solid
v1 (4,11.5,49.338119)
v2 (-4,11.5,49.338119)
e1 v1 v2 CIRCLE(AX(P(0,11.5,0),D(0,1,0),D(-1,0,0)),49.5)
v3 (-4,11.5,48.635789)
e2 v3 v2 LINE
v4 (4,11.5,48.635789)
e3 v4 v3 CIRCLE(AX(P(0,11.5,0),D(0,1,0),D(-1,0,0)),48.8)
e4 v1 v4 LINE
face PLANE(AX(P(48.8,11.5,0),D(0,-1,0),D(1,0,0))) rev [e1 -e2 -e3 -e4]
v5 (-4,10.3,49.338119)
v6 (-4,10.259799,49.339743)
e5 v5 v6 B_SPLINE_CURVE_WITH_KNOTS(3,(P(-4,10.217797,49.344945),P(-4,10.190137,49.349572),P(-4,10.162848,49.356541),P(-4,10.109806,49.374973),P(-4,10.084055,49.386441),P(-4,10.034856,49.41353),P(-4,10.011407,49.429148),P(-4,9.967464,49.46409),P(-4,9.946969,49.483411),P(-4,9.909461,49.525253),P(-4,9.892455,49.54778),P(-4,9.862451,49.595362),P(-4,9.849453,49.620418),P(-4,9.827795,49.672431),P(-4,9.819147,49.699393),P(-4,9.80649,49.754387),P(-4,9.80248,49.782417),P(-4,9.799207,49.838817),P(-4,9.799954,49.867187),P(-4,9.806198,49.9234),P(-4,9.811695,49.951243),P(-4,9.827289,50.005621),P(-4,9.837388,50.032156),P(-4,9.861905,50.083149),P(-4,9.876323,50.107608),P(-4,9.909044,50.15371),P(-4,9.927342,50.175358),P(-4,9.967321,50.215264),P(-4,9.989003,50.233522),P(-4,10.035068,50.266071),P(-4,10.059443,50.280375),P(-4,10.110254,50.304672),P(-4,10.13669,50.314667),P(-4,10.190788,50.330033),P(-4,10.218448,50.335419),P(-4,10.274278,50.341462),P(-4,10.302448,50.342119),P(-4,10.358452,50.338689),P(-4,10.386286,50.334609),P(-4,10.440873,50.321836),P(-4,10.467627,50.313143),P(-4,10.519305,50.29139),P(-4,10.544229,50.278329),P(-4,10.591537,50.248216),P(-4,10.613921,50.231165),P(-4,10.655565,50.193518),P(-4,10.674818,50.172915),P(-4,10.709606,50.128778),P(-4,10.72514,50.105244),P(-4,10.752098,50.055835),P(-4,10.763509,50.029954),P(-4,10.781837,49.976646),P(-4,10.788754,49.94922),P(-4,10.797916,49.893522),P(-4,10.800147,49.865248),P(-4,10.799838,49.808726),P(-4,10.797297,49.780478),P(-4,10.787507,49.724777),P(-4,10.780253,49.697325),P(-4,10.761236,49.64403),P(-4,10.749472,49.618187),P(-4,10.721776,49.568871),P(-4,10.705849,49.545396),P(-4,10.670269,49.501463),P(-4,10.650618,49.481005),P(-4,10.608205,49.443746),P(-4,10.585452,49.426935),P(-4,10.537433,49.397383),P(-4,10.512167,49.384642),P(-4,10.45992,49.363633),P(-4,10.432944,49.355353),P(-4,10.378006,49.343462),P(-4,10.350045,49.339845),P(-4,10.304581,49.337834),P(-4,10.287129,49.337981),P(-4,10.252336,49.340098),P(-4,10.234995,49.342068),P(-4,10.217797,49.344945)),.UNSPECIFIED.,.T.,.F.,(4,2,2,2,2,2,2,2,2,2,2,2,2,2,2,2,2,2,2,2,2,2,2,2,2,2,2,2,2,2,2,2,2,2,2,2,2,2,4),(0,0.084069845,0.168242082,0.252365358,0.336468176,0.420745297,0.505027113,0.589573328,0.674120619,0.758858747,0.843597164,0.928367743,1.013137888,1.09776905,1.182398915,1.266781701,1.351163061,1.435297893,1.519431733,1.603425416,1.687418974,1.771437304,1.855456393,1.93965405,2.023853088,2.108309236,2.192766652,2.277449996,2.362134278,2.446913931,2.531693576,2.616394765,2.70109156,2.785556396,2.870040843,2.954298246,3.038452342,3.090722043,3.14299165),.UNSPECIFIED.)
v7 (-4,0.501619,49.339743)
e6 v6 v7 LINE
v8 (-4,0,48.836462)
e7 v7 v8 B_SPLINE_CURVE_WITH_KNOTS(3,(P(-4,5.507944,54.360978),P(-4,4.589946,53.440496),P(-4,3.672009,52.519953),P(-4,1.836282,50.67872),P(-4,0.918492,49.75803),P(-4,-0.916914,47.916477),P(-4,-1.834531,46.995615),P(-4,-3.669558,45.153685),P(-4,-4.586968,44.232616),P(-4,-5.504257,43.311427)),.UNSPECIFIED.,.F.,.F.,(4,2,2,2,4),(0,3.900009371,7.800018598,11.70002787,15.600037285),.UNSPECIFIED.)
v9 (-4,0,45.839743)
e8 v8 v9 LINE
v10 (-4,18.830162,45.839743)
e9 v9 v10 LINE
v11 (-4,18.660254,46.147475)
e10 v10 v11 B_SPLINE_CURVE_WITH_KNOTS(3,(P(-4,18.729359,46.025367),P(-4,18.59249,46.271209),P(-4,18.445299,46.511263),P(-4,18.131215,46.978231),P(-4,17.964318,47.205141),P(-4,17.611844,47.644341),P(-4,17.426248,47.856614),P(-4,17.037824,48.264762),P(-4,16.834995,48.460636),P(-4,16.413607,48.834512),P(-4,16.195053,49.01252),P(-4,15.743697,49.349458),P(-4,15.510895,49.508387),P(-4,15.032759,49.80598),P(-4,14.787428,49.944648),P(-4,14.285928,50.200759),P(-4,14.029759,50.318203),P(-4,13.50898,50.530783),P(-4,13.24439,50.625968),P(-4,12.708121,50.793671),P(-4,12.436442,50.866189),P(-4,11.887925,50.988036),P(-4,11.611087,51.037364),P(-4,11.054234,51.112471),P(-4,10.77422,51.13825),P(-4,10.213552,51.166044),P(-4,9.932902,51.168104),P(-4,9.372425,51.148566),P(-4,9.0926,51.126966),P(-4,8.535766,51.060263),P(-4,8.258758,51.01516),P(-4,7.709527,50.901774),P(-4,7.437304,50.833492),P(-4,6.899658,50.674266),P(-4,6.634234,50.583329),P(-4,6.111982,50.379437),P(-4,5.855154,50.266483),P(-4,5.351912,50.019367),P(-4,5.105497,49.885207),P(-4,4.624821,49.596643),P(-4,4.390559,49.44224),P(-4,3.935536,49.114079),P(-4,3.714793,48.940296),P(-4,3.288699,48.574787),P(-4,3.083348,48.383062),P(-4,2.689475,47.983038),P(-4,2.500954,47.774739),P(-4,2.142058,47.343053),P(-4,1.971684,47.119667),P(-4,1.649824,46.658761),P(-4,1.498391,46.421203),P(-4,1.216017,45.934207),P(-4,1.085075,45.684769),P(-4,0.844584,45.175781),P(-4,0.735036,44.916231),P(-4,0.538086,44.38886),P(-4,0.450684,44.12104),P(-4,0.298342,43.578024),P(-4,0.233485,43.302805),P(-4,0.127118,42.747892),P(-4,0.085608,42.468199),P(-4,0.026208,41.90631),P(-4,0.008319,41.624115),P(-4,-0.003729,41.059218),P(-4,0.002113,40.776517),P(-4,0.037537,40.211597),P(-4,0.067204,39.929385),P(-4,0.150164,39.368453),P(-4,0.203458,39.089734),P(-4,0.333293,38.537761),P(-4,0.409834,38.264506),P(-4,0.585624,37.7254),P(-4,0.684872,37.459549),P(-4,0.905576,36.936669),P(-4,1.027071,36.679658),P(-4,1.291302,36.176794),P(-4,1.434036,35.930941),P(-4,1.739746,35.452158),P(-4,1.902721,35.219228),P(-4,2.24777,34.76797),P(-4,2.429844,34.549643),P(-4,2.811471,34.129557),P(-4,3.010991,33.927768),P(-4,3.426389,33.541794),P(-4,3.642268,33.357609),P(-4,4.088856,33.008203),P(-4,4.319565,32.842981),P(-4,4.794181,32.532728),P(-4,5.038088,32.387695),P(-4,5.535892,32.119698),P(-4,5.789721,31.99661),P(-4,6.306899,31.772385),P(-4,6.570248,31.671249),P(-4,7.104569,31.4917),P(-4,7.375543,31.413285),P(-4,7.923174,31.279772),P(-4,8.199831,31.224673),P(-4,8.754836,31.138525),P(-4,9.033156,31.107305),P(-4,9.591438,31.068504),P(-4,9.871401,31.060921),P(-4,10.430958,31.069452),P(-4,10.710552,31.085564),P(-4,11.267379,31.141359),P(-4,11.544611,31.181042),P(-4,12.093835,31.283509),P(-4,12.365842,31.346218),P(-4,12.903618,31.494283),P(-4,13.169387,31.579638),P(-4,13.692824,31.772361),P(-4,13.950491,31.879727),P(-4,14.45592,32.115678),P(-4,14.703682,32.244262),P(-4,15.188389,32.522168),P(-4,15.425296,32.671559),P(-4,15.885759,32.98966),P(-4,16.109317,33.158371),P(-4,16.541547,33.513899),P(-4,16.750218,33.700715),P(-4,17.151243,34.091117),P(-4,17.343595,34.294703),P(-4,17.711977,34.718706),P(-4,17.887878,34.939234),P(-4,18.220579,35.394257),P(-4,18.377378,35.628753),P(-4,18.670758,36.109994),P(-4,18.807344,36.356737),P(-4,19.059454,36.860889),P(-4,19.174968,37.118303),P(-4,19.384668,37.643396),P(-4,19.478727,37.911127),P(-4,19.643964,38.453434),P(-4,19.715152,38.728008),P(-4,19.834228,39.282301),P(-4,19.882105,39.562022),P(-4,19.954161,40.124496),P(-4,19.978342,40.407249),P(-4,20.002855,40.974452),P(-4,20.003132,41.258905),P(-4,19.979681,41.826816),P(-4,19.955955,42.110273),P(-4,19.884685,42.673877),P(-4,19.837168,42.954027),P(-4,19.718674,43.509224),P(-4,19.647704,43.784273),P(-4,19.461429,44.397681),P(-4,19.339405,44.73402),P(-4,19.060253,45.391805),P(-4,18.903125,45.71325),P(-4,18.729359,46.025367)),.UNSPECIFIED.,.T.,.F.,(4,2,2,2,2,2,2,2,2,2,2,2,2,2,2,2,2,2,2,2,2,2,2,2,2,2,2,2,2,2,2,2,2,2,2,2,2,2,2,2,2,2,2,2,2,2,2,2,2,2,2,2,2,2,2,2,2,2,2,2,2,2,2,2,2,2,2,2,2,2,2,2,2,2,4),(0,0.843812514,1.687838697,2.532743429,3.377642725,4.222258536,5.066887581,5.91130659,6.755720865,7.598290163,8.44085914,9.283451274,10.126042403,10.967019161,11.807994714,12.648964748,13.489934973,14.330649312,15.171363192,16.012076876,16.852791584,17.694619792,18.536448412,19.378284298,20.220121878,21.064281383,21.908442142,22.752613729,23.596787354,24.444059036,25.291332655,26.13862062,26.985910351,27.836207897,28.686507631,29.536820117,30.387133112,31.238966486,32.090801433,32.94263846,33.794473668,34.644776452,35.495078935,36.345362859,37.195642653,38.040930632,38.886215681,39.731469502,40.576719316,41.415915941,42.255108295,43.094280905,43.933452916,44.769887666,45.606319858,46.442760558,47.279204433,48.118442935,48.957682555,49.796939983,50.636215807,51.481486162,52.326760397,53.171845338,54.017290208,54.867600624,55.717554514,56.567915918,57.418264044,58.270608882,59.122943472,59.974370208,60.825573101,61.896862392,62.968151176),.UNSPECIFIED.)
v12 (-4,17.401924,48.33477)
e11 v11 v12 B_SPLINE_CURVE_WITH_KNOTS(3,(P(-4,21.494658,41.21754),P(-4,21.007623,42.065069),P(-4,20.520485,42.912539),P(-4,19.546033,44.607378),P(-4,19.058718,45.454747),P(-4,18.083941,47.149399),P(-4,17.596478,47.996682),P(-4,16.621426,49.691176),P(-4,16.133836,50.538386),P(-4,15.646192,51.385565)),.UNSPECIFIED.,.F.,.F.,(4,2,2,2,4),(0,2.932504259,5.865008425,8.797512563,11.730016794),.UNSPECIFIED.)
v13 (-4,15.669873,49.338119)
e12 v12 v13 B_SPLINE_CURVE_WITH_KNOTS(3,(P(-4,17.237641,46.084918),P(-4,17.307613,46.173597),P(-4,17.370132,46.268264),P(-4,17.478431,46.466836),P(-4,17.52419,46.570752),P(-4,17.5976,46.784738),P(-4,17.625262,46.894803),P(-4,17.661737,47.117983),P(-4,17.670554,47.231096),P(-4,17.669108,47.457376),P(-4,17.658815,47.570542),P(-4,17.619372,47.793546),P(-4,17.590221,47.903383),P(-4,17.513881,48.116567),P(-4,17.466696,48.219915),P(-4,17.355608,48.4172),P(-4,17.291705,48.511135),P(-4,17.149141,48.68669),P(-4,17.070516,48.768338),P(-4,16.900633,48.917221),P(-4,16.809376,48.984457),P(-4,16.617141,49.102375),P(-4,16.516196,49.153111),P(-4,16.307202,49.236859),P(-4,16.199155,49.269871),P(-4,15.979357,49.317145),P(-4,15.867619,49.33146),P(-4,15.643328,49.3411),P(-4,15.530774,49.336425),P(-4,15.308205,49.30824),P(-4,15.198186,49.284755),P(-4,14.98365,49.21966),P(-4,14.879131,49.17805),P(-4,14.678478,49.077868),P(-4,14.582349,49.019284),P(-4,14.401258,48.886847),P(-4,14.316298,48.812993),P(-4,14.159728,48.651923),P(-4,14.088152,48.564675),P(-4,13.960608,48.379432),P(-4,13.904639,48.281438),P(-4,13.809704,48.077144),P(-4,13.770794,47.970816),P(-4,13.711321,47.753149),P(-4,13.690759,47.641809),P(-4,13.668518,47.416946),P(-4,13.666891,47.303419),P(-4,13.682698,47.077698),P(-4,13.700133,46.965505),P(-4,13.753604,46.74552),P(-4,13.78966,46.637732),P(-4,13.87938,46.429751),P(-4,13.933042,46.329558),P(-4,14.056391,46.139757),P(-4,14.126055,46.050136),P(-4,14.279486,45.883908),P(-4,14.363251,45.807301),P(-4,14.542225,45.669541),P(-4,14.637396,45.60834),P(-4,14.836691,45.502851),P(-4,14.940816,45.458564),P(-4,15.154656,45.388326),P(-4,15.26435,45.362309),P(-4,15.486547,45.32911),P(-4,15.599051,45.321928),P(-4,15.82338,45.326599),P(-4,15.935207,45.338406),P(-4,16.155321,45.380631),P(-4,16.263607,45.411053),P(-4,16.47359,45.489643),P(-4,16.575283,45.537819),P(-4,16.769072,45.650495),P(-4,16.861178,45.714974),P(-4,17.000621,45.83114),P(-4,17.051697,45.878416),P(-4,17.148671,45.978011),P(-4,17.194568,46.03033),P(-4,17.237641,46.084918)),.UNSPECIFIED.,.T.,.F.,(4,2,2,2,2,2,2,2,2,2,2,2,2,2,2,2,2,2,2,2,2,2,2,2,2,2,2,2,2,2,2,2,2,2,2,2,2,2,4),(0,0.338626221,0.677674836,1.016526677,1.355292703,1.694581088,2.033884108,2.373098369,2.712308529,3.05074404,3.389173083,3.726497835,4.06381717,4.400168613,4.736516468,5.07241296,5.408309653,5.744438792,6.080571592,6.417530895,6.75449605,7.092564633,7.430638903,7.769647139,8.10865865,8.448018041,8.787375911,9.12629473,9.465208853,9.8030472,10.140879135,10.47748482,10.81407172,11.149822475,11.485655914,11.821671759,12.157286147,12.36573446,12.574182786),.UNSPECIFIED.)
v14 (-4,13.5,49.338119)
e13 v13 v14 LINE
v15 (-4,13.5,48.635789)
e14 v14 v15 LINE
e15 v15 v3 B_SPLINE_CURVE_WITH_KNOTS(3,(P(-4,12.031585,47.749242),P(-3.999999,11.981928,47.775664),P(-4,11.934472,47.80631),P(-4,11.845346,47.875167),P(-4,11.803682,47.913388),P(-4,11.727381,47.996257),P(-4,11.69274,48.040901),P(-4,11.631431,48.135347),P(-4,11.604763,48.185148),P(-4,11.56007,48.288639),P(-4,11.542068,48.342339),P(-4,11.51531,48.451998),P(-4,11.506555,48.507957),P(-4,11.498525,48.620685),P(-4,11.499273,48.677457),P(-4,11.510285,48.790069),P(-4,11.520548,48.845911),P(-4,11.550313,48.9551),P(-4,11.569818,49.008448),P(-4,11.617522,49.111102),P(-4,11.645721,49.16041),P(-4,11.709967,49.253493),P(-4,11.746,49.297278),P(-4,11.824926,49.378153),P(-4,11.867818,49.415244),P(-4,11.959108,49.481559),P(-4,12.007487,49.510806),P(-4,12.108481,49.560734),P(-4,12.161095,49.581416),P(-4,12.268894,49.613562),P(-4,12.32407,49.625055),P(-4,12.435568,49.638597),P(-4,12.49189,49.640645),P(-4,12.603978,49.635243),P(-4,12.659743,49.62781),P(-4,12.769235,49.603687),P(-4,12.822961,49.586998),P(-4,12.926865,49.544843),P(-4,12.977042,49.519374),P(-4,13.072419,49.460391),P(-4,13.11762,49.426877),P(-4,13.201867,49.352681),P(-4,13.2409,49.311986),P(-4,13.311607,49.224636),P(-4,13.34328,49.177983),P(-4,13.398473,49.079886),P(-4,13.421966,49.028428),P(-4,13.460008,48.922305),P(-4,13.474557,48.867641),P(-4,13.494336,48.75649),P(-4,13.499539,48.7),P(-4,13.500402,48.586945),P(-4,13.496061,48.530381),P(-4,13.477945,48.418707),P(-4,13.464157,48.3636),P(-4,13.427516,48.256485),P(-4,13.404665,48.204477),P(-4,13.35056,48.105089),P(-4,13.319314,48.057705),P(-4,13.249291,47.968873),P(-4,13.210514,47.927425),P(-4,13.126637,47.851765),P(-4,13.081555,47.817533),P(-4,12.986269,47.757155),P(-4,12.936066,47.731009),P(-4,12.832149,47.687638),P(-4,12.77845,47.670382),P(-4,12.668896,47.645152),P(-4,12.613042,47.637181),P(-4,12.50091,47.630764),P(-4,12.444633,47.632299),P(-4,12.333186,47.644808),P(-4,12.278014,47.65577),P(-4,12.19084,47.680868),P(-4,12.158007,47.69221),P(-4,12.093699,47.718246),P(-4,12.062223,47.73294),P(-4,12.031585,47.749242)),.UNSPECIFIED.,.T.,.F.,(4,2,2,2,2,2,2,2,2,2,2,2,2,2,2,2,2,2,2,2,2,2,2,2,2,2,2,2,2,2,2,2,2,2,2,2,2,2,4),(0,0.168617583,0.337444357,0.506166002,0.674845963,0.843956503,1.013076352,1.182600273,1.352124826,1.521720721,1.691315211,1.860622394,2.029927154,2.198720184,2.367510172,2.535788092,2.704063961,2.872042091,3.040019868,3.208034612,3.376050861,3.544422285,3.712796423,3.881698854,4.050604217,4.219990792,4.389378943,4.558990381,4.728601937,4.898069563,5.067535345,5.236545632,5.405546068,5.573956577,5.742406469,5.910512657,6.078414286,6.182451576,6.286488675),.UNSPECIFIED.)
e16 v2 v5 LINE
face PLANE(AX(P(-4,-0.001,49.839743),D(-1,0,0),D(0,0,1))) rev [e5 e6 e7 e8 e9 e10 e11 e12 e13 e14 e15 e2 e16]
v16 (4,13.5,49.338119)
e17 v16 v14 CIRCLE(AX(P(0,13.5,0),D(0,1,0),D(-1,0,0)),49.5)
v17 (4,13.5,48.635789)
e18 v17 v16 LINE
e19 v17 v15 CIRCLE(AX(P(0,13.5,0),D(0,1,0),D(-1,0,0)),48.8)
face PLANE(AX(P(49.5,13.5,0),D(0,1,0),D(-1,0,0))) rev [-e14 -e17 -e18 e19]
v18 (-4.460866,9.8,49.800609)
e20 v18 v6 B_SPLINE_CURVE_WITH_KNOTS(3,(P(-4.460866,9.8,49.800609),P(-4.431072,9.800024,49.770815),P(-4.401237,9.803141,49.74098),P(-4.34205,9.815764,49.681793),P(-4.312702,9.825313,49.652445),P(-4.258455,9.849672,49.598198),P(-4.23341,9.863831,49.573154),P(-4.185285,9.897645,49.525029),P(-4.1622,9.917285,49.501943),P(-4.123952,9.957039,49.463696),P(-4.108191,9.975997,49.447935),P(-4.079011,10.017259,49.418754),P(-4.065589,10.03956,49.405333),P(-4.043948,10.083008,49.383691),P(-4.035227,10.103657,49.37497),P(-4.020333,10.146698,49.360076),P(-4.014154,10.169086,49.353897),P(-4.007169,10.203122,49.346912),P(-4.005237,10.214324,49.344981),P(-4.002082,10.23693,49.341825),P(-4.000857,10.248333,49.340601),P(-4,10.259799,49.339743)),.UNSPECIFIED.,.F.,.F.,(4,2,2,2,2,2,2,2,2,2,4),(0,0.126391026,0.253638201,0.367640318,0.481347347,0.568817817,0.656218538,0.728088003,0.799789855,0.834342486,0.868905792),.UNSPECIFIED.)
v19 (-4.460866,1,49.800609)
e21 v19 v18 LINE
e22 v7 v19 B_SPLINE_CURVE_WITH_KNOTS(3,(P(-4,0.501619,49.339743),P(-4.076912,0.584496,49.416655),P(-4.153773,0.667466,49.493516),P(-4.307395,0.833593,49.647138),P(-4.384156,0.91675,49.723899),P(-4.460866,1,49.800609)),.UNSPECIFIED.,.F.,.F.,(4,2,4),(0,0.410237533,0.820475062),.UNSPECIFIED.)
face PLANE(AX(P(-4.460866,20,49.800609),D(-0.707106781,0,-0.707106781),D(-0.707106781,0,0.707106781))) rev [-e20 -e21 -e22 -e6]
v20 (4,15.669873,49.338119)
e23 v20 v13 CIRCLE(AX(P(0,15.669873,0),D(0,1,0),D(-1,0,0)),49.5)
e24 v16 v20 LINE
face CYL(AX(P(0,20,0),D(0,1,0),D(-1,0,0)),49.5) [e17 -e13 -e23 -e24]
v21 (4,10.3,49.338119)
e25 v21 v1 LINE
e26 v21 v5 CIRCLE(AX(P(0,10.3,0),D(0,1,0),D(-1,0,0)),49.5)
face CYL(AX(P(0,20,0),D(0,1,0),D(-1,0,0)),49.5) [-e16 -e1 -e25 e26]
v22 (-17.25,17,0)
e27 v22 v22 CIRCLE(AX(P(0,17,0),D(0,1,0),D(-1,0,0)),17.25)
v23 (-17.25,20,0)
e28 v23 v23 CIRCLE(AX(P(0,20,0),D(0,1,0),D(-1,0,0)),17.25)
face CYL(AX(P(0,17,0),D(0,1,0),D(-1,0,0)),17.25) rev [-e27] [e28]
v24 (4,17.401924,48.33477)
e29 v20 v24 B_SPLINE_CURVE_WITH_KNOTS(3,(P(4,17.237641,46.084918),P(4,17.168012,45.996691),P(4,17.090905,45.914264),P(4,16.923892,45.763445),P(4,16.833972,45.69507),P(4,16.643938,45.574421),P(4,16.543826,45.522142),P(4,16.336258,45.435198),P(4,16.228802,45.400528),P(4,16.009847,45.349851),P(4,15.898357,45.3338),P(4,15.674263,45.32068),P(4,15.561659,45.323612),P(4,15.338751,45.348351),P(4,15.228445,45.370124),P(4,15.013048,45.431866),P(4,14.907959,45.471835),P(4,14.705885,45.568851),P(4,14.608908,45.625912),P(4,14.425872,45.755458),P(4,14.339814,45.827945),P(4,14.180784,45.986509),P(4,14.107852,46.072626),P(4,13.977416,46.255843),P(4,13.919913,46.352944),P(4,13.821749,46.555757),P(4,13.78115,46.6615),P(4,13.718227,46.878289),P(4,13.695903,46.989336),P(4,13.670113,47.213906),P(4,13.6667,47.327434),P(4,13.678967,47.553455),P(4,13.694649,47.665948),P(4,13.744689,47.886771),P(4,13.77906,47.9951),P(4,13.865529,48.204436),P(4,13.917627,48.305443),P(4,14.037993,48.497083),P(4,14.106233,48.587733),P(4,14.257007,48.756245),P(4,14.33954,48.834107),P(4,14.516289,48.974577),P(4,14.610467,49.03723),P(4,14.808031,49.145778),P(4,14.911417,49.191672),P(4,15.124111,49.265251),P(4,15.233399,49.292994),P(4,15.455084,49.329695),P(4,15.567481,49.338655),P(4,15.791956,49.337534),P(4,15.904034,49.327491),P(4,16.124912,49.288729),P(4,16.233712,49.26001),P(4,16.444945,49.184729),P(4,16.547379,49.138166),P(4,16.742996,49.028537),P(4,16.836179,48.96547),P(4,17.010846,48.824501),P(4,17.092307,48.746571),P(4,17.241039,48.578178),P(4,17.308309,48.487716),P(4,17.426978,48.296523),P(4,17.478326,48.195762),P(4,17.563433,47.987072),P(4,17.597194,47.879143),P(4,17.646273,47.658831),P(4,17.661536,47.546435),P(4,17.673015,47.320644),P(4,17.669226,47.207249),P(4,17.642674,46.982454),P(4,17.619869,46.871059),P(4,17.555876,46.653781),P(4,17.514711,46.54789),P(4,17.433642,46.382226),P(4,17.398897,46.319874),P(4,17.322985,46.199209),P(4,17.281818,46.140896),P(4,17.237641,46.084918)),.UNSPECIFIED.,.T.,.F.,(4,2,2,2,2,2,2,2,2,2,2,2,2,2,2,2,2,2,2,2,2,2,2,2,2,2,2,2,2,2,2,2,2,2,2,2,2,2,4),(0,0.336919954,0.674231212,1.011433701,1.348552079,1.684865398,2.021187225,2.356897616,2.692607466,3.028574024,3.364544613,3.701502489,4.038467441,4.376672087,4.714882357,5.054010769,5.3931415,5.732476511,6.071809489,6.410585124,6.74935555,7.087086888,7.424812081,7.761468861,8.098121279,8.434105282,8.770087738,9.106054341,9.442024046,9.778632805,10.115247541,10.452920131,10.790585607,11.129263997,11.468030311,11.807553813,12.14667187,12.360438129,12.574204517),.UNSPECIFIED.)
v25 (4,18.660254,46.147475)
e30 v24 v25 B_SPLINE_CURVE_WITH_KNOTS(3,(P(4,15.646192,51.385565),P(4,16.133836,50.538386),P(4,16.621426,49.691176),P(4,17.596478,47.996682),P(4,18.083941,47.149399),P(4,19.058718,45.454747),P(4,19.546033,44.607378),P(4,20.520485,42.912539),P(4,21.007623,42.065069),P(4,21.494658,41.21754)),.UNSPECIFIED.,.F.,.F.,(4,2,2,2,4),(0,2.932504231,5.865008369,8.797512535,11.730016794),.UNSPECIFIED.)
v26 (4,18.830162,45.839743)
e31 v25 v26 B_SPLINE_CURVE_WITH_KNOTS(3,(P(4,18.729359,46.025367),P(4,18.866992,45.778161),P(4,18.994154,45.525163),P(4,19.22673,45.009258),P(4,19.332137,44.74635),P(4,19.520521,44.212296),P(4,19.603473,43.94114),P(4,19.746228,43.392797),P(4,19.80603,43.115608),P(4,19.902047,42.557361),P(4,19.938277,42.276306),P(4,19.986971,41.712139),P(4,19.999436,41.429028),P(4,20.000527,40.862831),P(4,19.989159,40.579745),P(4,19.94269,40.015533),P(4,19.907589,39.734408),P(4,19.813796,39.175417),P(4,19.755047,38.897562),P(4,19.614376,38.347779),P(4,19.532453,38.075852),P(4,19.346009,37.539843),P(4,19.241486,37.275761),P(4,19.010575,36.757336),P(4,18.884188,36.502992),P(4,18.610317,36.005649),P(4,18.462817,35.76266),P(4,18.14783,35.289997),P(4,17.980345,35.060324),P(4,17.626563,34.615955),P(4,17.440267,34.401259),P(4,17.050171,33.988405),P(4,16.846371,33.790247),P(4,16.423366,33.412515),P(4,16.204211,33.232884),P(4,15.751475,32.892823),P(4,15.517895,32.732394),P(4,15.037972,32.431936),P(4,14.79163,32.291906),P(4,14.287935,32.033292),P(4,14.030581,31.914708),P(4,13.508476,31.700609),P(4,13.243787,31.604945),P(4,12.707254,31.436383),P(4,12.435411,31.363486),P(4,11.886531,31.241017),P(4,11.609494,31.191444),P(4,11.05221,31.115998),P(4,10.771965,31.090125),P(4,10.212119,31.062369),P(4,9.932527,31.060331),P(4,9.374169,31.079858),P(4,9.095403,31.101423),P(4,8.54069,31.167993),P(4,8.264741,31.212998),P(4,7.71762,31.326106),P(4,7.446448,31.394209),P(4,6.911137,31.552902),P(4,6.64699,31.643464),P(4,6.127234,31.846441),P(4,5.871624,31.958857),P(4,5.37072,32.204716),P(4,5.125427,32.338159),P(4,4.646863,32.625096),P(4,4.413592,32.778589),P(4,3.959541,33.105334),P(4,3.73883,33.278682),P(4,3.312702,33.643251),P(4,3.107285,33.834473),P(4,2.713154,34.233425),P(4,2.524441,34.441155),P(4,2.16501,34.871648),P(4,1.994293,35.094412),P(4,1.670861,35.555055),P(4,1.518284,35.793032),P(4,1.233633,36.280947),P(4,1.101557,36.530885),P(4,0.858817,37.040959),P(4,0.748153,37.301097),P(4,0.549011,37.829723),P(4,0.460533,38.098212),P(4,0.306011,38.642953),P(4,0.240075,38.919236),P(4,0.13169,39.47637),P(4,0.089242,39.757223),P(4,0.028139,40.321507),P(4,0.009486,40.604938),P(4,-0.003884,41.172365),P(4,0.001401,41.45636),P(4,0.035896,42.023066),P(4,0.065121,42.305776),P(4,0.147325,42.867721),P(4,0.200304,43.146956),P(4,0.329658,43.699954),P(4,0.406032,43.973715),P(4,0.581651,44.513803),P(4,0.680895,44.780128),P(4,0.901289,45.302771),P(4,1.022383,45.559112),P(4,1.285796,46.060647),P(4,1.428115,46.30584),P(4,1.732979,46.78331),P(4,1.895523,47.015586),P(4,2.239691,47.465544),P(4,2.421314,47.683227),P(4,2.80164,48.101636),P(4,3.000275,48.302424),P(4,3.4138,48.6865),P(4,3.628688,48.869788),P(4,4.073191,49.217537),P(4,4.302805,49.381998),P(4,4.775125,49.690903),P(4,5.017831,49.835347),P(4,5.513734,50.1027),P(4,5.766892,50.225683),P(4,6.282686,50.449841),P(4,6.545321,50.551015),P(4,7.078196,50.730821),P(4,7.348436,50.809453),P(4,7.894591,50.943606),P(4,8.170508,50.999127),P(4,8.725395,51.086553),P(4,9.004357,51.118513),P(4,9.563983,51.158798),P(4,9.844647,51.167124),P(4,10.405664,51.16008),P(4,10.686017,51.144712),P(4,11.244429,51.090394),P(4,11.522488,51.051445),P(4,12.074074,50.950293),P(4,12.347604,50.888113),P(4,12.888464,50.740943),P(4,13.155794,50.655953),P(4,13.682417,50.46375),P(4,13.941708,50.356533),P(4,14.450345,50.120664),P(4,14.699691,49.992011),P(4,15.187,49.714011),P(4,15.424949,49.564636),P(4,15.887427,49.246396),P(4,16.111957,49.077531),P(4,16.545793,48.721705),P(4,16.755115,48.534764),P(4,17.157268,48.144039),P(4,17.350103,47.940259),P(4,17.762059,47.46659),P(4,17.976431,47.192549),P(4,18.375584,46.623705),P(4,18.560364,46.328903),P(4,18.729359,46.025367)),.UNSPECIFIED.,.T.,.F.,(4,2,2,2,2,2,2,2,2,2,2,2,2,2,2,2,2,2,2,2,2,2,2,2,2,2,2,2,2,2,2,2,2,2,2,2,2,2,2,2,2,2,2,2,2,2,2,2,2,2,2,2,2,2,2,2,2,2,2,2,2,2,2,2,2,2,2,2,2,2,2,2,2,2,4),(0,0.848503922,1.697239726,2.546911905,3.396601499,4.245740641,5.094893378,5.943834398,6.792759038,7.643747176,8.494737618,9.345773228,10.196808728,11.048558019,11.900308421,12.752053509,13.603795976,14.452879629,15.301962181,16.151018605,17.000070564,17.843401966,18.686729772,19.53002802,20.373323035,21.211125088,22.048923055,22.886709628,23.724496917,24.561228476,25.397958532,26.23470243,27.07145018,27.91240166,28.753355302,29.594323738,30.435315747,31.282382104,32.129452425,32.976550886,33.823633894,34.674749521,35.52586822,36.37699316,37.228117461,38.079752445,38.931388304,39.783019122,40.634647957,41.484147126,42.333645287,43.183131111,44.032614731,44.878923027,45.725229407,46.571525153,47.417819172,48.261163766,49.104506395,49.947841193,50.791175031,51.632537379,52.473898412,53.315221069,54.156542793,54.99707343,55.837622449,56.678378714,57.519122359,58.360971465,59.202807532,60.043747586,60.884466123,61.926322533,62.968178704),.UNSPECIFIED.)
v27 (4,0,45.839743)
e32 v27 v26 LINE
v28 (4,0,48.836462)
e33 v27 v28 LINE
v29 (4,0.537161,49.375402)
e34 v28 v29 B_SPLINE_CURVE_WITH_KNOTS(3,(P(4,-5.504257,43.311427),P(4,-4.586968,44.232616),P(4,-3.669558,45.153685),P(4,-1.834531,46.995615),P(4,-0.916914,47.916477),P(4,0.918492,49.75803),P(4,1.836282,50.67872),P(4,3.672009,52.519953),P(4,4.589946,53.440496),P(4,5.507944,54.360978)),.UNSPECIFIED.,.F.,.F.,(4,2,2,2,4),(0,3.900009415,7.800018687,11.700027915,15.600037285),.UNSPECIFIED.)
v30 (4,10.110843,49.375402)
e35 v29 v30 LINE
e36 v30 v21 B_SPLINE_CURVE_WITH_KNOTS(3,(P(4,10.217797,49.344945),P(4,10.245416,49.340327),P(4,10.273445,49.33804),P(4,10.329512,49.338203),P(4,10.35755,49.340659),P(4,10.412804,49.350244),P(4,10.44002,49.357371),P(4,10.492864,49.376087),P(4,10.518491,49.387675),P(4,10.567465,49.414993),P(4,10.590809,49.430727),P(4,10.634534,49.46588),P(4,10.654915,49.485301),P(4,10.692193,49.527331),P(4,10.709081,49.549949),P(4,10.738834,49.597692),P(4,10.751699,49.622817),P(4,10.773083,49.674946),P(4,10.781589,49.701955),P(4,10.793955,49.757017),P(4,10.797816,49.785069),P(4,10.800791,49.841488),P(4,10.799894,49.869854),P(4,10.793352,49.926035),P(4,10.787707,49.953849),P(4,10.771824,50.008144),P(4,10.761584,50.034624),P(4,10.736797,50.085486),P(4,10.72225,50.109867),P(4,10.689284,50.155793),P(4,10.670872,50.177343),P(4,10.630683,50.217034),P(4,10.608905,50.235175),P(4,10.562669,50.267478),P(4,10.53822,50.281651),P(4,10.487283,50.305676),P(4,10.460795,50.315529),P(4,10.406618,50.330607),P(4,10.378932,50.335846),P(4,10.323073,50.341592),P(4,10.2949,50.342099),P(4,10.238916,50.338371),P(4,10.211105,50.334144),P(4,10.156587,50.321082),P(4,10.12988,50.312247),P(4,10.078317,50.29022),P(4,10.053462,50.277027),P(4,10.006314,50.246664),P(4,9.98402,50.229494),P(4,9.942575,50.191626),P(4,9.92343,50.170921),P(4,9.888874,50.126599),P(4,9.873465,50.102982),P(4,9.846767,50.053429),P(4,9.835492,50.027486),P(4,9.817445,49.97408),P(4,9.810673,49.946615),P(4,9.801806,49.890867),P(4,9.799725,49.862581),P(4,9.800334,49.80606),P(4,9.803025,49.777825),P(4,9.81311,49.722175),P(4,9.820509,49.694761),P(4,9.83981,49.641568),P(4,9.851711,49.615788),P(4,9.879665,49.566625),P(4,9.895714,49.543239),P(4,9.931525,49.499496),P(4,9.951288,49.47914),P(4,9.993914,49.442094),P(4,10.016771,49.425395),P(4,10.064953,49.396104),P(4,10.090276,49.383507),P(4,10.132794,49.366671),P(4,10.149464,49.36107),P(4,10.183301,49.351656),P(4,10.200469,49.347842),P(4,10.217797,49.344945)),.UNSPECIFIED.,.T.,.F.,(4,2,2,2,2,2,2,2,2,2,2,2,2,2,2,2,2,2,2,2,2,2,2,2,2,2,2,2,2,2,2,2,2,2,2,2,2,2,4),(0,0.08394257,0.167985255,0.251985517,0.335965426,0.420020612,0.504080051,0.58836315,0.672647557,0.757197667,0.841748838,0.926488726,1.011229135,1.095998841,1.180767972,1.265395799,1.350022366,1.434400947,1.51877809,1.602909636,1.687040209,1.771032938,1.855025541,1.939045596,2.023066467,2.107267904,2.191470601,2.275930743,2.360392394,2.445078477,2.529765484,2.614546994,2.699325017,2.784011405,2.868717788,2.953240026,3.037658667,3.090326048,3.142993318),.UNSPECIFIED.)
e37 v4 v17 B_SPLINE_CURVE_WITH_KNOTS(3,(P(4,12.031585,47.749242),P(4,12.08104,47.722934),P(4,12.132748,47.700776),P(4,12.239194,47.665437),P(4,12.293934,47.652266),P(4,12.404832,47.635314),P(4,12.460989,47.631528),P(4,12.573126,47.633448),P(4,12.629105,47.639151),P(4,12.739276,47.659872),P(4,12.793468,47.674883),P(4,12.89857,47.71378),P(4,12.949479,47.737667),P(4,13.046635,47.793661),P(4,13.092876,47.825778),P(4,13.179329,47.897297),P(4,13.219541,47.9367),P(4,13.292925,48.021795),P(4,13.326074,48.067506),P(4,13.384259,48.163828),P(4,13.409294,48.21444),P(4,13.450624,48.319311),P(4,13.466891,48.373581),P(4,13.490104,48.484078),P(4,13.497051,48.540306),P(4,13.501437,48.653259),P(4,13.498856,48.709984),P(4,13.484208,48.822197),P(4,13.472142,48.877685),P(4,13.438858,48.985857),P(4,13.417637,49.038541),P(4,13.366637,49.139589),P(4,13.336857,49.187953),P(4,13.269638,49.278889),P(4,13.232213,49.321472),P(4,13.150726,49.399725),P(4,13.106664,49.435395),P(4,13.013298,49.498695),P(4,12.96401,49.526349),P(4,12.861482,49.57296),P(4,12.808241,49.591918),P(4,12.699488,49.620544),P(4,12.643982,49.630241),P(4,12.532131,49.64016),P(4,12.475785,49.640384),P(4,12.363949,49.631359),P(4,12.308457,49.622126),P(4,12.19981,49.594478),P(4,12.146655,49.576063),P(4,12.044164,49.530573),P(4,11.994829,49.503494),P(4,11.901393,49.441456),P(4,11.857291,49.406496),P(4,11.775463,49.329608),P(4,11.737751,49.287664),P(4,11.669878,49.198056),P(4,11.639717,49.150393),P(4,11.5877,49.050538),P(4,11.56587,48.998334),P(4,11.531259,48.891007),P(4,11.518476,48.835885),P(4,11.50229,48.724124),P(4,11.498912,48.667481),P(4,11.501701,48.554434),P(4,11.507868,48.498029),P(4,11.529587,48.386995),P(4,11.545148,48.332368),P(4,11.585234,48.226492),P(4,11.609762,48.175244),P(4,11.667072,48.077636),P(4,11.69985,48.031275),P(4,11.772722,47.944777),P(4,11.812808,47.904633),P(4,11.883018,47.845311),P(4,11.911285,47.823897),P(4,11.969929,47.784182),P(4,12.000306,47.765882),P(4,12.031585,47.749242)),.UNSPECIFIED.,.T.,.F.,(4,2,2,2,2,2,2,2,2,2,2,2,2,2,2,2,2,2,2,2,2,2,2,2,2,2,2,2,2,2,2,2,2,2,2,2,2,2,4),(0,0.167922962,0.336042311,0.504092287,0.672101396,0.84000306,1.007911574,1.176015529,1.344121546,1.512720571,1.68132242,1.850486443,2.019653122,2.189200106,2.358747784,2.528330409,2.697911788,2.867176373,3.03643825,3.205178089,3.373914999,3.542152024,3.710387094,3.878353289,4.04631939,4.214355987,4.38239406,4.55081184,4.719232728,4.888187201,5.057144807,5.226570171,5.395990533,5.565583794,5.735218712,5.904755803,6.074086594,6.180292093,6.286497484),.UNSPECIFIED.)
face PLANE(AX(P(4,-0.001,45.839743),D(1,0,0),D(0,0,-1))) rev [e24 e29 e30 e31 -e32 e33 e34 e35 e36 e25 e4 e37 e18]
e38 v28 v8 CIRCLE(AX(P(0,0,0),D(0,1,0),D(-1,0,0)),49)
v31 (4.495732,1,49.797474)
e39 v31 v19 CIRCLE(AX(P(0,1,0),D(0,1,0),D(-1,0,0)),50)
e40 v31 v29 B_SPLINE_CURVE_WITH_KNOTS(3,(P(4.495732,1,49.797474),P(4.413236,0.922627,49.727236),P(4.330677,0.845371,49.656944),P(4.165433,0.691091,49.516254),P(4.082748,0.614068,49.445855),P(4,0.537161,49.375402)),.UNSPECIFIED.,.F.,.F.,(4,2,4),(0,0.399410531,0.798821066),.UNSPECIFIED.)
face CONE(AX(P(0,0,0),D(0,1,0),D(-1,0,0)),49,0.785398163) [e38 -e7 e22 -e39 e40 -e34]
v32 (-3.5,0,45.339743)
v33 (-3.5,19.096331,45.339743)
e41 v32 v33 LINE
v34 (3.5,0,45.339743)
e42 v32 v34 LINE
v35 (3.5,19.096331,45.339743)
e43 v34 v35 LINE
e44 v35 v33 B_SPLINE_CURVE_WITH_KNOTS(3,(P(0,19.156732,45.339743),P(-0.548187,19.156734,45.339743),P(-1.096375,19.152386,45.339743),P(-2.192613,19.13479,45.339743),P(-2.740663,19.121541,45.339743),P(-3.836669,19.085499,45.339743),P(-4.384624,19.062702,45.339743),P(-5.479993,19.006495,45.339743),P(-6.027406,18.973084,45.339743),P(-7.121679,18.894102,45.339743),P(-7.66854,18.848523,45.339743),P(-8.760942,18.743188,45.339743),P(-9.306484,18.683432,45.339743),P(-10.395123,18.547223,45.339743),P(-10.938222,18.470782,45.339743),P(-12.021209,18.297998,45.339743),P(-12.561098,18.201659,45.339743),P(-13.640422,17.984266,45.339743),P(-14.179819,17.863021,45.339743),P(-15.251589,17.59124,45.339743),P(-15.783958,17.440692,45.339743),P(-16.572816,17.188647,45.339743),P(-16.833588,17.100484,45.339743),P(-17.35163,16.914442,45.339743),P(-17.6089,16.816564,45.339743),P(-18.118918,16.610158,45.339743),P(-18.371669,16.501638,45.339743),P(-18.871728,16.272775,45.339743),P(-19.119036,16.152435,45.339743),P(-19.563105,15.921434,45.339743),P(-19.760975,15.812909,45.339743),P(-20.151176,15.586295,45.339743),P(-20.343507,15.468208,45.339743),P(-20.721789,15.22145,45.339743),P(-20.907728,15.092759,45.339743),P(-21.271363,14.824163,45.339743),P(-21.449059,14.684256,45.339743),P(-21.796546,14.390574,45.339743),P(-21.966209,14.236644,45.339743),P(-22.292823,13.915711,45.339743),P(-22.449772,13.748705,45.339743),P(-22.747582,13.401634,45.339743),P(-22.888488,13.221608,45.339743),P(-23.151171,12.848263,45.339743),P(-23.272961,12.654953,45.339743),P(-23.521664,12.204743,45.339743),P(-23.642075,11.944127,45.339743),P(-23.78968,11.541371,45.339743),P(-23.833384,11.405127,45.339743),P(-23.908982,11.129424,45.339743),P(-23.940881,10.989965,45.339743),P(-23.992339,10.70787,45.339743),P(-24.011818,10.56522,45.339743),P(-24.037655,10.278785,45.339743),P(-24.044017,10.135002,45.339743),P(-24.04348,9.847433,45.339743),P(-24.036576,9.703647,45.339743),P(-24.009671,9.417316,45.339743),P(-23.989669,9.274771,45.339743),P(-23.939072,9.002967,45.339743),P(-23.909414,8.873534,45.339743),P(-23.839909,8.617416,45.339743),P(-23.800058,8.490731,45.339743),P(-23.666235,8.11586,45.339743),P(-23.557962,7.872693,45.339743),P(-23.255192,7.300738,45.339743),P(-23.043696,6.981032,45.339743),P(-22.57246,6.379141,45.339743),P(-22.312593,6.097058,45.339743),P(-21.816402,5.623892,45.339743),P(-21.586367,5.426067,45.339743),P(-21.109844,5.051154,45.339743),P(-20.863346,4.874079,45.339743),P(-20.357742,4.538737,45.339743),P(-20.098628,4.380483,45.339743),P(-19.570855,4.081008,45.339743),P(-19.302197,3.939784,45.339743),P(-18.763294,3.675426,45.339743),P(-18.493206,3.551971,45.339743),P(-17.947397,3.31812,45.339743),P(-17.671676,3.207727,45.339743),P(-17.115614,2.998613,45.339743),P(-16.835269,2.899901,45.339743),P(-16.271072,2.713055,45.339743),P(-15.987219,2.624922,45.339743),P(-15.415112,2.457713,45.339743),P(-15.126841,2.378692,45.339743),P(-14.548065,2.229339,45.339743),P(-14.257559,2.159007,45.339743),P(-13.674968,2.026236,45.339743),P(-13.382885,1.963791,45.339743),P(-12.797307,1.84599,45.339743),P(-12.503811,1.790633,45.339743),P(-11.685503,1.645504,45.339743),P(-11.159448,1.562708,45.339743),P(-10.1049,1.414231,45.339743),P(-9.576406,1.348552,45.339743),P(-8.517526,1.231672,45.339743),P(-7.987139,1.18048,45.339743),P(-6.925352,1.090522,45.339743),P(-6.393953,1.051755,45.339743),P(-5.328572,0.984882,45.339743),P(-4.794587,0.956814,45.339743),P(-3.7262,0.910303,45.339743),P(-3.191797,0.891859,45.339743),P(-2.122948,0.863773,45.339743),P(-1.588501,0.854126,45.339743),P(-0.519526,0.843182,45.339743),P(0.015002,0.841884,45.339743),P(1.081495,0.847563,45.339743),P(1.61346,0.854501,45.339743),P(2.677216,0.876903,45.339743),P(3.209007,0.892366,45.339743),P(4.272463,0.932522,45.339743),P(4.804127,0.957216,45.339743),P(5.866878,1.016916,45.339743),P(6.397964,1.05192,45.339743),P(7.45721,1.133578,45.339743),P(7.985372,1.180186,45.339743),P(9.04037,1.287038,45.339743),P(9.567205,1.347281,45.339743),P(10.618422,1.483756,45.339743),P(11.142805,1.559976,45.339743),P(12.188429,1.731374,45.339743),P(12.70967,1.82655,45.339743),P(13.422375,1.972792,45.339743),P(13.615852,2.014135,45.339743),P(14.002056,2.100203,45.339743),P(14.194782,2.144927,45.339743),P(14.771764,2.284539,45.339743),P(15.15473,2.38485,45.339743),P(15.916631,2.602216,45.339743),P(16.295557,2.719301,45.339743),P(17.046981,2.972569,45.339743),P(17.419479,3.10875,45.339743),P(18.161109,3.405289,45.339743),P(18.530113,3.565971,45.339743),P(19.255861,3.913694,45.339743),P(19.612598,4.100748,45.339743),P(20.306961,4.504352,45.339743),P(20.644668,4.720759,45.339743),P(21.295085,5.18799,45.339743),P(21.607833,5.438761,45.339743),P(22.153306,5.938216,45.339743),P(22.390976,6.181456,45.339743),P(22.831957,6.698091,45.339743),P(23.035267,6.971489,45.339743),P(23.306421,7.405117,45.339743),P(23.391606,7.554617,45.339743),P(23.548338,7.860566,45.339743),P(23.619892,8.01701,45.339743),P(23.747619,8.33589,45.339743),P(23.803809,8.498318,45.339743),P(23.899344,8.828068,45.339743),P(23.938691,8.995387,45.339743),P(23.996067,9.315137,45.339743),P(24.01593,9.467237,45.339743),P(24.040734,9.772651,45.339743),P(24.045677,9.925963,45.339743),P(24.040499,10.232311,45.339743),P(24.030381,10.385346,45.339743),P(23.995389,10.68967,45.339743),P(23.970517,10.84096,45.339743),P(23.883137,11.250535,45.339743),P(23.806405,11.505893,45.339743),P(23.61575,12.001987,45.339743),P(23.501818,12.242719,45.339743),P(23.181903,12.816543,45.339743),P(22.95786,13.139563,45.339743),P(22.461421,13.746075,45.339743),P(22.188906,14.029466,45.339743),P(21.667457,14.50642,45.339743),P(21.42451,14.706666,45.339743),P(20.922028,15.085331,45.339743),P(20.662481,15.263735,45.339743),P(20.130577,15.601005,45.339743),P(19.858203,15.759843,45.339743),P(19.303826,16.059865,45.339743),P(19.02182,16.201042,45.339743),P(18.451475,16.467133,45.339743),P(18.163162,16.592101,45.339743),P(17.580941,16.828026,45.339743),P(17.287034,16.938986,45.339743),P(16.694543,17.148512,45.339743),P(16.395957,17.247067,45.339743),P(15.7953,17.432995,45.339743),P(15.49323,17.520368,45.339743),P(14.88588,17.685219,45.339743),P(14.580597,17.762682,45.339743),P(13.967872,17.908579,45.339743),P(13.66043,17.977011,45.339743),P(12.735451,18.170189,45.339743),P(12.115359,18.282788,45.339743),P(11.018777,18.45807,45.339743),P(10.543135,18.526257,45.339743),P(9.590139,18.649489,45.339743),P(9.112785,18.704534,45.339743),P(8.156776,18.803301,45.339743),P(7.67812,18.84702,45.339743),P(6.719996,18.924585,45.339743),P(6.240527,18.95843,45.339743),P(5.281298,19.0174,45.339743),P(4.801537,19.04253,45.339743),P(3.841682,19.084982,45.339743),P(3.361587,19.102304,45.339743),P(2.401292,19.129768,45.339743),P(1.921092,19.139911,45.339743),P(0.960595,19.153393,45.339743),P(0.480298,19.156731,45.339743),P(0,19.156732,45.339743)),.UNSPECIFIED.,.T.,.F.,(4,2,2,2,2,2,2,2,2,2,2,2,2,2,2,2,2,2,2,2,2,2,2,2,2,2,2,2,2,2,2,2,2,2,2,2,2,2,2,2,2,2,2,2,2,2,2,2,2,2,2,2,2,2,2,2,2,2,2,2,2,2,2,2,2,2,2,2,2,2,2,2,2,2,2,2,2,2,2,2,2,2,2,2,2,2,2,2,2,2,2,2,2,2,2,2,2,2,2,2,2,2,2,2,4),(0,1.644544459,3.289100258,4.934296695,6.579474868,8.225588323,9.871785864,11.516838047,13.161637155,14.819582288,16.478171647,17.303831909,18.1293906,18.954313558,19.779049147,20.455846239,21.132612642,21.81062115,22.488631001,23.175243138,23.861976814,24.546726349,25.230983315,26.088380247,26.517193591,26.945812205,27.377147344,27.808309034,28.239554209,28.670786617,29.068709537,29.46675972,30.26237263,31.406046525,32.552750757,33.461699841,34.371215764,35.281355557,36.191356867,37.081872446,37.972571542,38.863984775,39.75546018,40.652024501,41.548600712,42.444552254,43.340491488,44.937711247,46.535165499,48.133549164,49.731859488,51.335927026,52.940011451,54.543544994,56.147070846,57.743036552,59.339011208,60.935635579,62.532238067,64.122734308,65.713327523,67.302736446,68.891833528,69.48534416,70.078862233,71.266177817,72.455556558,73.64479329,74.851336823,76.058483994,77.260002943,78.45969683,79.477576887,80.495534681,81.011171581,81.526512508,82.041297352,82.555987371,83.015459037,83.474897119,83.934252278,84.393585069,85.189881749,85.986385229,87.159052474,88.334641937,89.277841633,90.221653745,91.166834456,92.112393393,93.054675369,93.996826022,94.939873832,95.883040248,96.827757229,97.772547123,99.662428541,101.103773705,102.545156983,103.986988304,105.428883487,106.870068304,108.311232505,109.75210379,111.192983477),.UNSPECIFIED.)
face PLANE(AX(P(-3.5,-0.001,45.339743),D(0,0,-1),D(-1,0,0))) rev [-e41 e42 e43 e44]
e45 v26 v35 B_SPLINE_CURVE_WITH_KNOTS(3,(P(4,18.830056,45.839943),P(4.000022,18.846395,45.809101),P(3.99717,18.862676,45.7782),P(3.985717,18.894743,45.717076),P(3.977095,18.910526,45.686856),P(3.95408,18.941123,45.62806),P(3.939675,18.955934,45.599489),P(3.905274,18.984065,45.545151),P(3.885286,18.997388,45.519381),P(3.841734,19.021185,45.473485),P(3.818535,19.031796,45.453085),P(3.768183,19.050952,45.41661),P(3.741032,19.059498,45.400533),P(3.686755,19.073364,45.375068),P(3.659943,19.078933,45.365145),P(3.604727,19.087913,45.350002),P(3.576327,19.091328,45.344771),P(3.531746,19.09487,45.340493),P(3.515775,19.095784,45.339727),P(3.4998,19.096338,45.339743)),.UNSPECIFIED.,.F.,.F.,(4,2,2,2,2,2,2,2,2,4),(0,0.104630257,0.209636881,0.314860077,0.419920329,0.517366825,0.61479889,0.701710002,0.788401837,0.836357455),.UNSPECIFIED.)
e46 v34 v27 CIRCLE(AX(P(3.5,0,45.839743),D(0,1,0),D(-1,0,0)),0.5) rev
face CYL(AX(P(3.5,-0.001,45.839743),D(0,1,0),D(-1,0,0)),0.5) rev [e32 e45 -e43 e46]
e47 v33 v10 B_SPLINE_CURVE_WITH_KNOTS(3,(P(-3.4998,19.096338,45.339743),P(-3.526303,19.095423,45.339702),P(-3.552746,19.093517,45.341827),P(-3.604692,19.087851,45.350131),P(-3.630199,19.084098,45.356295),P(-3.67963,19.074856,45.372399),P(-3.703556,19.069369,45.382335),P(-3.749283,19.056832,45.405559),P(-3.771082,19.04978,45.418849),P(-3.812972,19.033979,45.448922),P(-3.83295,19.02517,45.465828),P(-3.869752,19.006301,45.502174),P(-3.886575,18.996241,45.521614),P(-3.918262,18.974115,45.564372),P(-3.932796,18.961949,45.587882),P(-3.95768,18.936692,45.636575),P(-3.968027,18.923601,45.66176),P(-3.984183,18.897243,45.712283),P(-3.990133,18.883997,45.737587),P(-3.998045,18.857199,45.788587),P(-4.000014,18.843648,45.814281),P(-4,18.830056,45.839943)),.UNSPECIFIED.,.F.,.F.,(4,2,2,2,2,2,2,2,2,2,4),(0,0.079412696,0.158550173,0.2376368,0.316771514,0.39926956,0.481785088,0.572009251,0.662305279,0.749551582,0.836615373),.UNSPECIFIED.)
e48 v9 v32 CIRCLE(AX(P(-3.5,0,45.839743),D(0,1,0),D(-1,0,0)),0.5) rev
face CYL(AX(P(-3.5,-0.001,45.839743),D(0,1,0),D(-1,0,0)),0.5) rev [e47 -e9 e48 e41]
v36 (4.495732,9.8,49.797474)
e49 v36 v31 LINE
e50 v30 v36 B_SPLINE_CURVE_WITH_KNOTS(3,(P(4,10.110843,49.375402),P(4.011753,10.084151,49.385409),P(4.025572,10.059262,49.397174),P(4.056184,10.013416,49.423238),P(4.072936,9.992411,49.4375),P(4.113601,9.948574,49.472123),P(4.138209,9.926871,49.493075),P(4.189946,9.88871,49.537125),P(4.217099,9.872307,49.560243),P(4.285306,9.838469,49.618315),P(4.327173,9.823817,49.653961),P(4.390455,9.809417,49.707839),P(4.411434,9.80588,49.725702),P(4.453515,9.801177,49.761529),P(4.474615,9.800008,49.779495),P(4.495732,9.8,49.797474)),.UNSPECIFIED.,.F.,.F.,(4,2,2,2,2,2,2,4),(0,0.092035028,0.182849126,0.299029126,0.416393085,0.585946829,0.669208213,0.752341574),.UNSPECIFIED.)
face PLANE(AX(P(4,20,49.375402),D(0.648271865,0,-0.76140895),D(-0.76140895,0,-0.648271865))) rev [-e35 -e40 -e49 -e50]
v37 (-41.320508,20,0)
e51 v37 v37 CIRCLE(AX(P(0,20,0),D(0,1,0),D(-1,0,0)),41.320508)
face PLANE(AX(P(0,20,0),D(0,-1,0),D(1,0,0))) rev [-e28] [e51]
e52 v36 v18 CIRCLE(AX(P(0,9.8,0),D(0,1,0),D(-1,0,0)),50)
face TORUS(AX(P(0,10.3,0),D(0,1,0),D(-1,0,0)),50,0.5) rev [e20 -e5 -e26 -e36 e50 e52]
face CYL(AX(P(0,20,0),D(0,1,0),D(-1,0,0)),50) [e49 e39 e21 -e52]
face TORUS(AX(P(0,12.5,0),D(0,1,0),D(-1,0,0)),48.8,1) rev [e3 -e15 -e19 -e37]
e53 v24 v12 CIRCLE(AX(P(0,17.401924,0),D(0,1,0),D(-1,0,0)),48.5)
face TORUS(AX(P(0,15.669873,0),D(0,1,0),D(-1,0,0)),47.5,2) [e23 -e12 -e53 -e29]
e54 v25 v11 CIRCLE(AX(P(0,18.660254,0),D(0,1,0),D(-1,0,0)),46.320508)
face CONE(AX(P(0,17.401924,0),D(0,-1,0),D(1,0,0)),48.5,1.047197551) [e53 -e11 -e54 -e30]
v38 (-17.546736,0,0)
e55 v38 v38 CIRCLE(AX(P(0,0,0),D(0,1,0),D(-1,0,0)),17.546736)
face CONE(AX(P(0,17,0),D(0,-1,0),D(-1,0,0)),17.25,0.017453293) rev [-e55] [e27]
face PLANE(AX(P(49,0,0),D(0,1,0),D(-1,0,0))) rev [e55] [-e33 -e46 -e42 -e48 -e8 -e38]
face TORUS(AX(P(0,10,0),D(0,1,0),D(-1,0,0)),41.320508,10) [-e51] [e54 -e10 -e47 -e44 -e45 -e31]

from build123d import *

# Parameters (mm, degrees)
CORTE_EXTRUS_O_CHAVETA_REACH = 75.485
CHANFRO1_SIZE                = 0.464340997
CHANFRO1_SIZE_2              = 0.5
ESBO_O_PERFIL_R              = 17.25
VIDA_DEPTH                   = 3
ESBO_O1_R                    = 17.25
CORTE_EXTRUS_O2_DEPTH        = 73.725511503
CORTE_EXTRUS_O2_DRAFT        = 1


with BuildPart() as part:
    # Revolução_Semi-Acabado: read off the stored shape, not the designer's step
    # Revolução_Semi-Acabado outline → Revolução_Semi-Acabado (revolve)
    with BuildSketch(Plane.XY):
        with BuildLine():
            Line((49, 0), (50, 1))
            Line((50, 1), (50, 9.8))
            ThreePointArc((50, 9.8), (49.646446609, 9.946446609), (49.5, 10.3))
            Line((49.5, 10.3), (49.5, 11.5))
            Line((49.5, 11.5), (48.8, 11.5))
            ThreePointArc((48.8, 11.5), (47.8, 12.5), (48.8, 13.5))
            Line((48.8, 13.5), (49.5, 13.5))
            Line((49.5, 13.5), (49.5, 15.669872981))
            ThreePointArc((49.5, 15.669872981), (49.232050808, 16.669872981), (48.5, 17.401923789))
            Line((48.5, 17.401923789), (46.320508076, 18.660254038))
            ThreePointArc((46.320508076, 18.660254038), (43.908698527, 19.659258263), (41.320508076, 20))
            Line((41.320508076, 20), (0, 20))
            Line((0, 20), (0, 0))
            Line((0, 0), (49, 0))
        make_face()
    revolve(axis=Axis((0, 0, 0), (0, 1, 0)))

    # Esboço_Chaveta → Corte-extrusão_Chaveta (cut, up to next)
    with BuildSketch(Plane(origin=(0, 20, 0), x_dir=(1, 0, 0), z_dir=(0, 1, 0)), mode=Mode.PRIVATE) as corte_extrus_o_chaveta_sk1:
        with BuildLine():
            Line((-4, -49.839743178), (-4, -45.839743178))
            ThreePointArc((-4, -45.839743178), (-3.853553391, -45.486189787), (-3.5, -45.339743178))
            Line((-3.5, -45.339743178), (3.5, -45.339743178))
            ThreePointArc((3.5, -45.339743178), (3.853553391, -45.486189787), (4, -45.839743178))
            Line((4, -45.839743178), (4, -49.839743178))
            ThreePointArc((4, -49.839743178), (0, -50), (-4, -49.839743178))
        make_face()
    corte_extrus_o_chaveta_tool1 = extrude(corte_extrus_o_chaveta_sk1.sketch, amount=-CORTE_EXTRUS_O_CHAVETA_REACH, mode=Mode.PRIVATE) & part.part
    add(corte_extrus_o_chaveta_tool1.solids().sort_by_distance((0, 20, 47.649827))[0], mode=Mode.SUBTRACT)

    # Chanfro1
    # the kernel refuses this chamfer: 0.5, 0.464340997 mm, written as the material it takes off along each edge
    with BuildSketch(Plane(origin=(4, 11.079499398, 49.839743178), x_dir=(0, 0, -1), z_dir=(0, -1, 0))) as chanfro1_piece_1:
        with BuildLine():
            Line((CHANFRO1_SIZE * 0.999999998989, 0), (0.042269405, 0.495731967))
            ThreePointArc((0.042269405, 0.495731967), (0.02111626, 0.25492797), (0, 0))
            Line((0, 0), (CHANFRO1_SIZE * 0.999999998989, 0))
        make_face()
    extrude(amount=11.358998797, mode=Mode.SUBTRACT)
    with BuildSketch(Plane(origin=(-4, 11.085841494, 49.839743178), x_dir=(0, 0, -1), z_dir=(0, -1, 0))) as chanfro1_piece_2:
        with BuildLine():
            Line((CHANFRO1_SIZE_2, 0), (0.039133999, -0.460866001))
            ThreePointArc((0.039133999, -0.460866001), (0.019579943, -0.236901616), (0, 0))
            Line((0, 0), (CHANFRO1_SIZE_2, 0))
        make_face()
    extrude(amount=11.371682988, mode=Mode.SUBTRACT)

    # Esboço_Perfil → VIDA (cut)
    with BuildSketch(Plane(origin=(0, 20, 0), x_dir=(1, 0, 0), z_dir=(0, 1, 0))):
        with Locations(Location((0, 0, 0), (0, 0, 180))):
            Circle(ESBO_O_PERFIL_R)
    extrude(amount=-VIDA_DEPTH, mode=Mode.SUBTRACT)


with BuildPart() as corte_extrus_o2_tool:
    # Esboço1 → Corte-extrusão2 (with draft: the straight prism first)
    with BuildSketch(Plane(origin=(0, 17, 0), x_dir=(1, 0, 0), z_dir=(0, 1, 0))):
        with Locations(Location((0, 0, 0), (0, 0, 180))):
            Circle(ESBO_O1_R)
    extrude(amount=-CORTE_EXTRUS_O2_DEPTH)
    # Corte-extrusão2: the draft: its side faces are tilted about the plane it starts from
    corte_extrus_o2_sides = [corte_extrus_o2_tool.faces().sort_by_distance(p)[0] for p in [
        (17.25, -19.862755752, 0),
    ]]
    draft(corte_extrus_o2_sides, Plane(origin=(0, 17, 0), x_dir=(1, 0, 0), z_dir=(0, 1, 0)), CORTE_EXTRUS_O2_DRAFT)


with BuildPart() as part_1:
    add(part.part)

    # Corte-extrusão2: cut by corte_extrus_o2_tool
    add(corte_extrus_o2_tool.part, mode=Mode.SUBTRACT)


solid = part_1.part
